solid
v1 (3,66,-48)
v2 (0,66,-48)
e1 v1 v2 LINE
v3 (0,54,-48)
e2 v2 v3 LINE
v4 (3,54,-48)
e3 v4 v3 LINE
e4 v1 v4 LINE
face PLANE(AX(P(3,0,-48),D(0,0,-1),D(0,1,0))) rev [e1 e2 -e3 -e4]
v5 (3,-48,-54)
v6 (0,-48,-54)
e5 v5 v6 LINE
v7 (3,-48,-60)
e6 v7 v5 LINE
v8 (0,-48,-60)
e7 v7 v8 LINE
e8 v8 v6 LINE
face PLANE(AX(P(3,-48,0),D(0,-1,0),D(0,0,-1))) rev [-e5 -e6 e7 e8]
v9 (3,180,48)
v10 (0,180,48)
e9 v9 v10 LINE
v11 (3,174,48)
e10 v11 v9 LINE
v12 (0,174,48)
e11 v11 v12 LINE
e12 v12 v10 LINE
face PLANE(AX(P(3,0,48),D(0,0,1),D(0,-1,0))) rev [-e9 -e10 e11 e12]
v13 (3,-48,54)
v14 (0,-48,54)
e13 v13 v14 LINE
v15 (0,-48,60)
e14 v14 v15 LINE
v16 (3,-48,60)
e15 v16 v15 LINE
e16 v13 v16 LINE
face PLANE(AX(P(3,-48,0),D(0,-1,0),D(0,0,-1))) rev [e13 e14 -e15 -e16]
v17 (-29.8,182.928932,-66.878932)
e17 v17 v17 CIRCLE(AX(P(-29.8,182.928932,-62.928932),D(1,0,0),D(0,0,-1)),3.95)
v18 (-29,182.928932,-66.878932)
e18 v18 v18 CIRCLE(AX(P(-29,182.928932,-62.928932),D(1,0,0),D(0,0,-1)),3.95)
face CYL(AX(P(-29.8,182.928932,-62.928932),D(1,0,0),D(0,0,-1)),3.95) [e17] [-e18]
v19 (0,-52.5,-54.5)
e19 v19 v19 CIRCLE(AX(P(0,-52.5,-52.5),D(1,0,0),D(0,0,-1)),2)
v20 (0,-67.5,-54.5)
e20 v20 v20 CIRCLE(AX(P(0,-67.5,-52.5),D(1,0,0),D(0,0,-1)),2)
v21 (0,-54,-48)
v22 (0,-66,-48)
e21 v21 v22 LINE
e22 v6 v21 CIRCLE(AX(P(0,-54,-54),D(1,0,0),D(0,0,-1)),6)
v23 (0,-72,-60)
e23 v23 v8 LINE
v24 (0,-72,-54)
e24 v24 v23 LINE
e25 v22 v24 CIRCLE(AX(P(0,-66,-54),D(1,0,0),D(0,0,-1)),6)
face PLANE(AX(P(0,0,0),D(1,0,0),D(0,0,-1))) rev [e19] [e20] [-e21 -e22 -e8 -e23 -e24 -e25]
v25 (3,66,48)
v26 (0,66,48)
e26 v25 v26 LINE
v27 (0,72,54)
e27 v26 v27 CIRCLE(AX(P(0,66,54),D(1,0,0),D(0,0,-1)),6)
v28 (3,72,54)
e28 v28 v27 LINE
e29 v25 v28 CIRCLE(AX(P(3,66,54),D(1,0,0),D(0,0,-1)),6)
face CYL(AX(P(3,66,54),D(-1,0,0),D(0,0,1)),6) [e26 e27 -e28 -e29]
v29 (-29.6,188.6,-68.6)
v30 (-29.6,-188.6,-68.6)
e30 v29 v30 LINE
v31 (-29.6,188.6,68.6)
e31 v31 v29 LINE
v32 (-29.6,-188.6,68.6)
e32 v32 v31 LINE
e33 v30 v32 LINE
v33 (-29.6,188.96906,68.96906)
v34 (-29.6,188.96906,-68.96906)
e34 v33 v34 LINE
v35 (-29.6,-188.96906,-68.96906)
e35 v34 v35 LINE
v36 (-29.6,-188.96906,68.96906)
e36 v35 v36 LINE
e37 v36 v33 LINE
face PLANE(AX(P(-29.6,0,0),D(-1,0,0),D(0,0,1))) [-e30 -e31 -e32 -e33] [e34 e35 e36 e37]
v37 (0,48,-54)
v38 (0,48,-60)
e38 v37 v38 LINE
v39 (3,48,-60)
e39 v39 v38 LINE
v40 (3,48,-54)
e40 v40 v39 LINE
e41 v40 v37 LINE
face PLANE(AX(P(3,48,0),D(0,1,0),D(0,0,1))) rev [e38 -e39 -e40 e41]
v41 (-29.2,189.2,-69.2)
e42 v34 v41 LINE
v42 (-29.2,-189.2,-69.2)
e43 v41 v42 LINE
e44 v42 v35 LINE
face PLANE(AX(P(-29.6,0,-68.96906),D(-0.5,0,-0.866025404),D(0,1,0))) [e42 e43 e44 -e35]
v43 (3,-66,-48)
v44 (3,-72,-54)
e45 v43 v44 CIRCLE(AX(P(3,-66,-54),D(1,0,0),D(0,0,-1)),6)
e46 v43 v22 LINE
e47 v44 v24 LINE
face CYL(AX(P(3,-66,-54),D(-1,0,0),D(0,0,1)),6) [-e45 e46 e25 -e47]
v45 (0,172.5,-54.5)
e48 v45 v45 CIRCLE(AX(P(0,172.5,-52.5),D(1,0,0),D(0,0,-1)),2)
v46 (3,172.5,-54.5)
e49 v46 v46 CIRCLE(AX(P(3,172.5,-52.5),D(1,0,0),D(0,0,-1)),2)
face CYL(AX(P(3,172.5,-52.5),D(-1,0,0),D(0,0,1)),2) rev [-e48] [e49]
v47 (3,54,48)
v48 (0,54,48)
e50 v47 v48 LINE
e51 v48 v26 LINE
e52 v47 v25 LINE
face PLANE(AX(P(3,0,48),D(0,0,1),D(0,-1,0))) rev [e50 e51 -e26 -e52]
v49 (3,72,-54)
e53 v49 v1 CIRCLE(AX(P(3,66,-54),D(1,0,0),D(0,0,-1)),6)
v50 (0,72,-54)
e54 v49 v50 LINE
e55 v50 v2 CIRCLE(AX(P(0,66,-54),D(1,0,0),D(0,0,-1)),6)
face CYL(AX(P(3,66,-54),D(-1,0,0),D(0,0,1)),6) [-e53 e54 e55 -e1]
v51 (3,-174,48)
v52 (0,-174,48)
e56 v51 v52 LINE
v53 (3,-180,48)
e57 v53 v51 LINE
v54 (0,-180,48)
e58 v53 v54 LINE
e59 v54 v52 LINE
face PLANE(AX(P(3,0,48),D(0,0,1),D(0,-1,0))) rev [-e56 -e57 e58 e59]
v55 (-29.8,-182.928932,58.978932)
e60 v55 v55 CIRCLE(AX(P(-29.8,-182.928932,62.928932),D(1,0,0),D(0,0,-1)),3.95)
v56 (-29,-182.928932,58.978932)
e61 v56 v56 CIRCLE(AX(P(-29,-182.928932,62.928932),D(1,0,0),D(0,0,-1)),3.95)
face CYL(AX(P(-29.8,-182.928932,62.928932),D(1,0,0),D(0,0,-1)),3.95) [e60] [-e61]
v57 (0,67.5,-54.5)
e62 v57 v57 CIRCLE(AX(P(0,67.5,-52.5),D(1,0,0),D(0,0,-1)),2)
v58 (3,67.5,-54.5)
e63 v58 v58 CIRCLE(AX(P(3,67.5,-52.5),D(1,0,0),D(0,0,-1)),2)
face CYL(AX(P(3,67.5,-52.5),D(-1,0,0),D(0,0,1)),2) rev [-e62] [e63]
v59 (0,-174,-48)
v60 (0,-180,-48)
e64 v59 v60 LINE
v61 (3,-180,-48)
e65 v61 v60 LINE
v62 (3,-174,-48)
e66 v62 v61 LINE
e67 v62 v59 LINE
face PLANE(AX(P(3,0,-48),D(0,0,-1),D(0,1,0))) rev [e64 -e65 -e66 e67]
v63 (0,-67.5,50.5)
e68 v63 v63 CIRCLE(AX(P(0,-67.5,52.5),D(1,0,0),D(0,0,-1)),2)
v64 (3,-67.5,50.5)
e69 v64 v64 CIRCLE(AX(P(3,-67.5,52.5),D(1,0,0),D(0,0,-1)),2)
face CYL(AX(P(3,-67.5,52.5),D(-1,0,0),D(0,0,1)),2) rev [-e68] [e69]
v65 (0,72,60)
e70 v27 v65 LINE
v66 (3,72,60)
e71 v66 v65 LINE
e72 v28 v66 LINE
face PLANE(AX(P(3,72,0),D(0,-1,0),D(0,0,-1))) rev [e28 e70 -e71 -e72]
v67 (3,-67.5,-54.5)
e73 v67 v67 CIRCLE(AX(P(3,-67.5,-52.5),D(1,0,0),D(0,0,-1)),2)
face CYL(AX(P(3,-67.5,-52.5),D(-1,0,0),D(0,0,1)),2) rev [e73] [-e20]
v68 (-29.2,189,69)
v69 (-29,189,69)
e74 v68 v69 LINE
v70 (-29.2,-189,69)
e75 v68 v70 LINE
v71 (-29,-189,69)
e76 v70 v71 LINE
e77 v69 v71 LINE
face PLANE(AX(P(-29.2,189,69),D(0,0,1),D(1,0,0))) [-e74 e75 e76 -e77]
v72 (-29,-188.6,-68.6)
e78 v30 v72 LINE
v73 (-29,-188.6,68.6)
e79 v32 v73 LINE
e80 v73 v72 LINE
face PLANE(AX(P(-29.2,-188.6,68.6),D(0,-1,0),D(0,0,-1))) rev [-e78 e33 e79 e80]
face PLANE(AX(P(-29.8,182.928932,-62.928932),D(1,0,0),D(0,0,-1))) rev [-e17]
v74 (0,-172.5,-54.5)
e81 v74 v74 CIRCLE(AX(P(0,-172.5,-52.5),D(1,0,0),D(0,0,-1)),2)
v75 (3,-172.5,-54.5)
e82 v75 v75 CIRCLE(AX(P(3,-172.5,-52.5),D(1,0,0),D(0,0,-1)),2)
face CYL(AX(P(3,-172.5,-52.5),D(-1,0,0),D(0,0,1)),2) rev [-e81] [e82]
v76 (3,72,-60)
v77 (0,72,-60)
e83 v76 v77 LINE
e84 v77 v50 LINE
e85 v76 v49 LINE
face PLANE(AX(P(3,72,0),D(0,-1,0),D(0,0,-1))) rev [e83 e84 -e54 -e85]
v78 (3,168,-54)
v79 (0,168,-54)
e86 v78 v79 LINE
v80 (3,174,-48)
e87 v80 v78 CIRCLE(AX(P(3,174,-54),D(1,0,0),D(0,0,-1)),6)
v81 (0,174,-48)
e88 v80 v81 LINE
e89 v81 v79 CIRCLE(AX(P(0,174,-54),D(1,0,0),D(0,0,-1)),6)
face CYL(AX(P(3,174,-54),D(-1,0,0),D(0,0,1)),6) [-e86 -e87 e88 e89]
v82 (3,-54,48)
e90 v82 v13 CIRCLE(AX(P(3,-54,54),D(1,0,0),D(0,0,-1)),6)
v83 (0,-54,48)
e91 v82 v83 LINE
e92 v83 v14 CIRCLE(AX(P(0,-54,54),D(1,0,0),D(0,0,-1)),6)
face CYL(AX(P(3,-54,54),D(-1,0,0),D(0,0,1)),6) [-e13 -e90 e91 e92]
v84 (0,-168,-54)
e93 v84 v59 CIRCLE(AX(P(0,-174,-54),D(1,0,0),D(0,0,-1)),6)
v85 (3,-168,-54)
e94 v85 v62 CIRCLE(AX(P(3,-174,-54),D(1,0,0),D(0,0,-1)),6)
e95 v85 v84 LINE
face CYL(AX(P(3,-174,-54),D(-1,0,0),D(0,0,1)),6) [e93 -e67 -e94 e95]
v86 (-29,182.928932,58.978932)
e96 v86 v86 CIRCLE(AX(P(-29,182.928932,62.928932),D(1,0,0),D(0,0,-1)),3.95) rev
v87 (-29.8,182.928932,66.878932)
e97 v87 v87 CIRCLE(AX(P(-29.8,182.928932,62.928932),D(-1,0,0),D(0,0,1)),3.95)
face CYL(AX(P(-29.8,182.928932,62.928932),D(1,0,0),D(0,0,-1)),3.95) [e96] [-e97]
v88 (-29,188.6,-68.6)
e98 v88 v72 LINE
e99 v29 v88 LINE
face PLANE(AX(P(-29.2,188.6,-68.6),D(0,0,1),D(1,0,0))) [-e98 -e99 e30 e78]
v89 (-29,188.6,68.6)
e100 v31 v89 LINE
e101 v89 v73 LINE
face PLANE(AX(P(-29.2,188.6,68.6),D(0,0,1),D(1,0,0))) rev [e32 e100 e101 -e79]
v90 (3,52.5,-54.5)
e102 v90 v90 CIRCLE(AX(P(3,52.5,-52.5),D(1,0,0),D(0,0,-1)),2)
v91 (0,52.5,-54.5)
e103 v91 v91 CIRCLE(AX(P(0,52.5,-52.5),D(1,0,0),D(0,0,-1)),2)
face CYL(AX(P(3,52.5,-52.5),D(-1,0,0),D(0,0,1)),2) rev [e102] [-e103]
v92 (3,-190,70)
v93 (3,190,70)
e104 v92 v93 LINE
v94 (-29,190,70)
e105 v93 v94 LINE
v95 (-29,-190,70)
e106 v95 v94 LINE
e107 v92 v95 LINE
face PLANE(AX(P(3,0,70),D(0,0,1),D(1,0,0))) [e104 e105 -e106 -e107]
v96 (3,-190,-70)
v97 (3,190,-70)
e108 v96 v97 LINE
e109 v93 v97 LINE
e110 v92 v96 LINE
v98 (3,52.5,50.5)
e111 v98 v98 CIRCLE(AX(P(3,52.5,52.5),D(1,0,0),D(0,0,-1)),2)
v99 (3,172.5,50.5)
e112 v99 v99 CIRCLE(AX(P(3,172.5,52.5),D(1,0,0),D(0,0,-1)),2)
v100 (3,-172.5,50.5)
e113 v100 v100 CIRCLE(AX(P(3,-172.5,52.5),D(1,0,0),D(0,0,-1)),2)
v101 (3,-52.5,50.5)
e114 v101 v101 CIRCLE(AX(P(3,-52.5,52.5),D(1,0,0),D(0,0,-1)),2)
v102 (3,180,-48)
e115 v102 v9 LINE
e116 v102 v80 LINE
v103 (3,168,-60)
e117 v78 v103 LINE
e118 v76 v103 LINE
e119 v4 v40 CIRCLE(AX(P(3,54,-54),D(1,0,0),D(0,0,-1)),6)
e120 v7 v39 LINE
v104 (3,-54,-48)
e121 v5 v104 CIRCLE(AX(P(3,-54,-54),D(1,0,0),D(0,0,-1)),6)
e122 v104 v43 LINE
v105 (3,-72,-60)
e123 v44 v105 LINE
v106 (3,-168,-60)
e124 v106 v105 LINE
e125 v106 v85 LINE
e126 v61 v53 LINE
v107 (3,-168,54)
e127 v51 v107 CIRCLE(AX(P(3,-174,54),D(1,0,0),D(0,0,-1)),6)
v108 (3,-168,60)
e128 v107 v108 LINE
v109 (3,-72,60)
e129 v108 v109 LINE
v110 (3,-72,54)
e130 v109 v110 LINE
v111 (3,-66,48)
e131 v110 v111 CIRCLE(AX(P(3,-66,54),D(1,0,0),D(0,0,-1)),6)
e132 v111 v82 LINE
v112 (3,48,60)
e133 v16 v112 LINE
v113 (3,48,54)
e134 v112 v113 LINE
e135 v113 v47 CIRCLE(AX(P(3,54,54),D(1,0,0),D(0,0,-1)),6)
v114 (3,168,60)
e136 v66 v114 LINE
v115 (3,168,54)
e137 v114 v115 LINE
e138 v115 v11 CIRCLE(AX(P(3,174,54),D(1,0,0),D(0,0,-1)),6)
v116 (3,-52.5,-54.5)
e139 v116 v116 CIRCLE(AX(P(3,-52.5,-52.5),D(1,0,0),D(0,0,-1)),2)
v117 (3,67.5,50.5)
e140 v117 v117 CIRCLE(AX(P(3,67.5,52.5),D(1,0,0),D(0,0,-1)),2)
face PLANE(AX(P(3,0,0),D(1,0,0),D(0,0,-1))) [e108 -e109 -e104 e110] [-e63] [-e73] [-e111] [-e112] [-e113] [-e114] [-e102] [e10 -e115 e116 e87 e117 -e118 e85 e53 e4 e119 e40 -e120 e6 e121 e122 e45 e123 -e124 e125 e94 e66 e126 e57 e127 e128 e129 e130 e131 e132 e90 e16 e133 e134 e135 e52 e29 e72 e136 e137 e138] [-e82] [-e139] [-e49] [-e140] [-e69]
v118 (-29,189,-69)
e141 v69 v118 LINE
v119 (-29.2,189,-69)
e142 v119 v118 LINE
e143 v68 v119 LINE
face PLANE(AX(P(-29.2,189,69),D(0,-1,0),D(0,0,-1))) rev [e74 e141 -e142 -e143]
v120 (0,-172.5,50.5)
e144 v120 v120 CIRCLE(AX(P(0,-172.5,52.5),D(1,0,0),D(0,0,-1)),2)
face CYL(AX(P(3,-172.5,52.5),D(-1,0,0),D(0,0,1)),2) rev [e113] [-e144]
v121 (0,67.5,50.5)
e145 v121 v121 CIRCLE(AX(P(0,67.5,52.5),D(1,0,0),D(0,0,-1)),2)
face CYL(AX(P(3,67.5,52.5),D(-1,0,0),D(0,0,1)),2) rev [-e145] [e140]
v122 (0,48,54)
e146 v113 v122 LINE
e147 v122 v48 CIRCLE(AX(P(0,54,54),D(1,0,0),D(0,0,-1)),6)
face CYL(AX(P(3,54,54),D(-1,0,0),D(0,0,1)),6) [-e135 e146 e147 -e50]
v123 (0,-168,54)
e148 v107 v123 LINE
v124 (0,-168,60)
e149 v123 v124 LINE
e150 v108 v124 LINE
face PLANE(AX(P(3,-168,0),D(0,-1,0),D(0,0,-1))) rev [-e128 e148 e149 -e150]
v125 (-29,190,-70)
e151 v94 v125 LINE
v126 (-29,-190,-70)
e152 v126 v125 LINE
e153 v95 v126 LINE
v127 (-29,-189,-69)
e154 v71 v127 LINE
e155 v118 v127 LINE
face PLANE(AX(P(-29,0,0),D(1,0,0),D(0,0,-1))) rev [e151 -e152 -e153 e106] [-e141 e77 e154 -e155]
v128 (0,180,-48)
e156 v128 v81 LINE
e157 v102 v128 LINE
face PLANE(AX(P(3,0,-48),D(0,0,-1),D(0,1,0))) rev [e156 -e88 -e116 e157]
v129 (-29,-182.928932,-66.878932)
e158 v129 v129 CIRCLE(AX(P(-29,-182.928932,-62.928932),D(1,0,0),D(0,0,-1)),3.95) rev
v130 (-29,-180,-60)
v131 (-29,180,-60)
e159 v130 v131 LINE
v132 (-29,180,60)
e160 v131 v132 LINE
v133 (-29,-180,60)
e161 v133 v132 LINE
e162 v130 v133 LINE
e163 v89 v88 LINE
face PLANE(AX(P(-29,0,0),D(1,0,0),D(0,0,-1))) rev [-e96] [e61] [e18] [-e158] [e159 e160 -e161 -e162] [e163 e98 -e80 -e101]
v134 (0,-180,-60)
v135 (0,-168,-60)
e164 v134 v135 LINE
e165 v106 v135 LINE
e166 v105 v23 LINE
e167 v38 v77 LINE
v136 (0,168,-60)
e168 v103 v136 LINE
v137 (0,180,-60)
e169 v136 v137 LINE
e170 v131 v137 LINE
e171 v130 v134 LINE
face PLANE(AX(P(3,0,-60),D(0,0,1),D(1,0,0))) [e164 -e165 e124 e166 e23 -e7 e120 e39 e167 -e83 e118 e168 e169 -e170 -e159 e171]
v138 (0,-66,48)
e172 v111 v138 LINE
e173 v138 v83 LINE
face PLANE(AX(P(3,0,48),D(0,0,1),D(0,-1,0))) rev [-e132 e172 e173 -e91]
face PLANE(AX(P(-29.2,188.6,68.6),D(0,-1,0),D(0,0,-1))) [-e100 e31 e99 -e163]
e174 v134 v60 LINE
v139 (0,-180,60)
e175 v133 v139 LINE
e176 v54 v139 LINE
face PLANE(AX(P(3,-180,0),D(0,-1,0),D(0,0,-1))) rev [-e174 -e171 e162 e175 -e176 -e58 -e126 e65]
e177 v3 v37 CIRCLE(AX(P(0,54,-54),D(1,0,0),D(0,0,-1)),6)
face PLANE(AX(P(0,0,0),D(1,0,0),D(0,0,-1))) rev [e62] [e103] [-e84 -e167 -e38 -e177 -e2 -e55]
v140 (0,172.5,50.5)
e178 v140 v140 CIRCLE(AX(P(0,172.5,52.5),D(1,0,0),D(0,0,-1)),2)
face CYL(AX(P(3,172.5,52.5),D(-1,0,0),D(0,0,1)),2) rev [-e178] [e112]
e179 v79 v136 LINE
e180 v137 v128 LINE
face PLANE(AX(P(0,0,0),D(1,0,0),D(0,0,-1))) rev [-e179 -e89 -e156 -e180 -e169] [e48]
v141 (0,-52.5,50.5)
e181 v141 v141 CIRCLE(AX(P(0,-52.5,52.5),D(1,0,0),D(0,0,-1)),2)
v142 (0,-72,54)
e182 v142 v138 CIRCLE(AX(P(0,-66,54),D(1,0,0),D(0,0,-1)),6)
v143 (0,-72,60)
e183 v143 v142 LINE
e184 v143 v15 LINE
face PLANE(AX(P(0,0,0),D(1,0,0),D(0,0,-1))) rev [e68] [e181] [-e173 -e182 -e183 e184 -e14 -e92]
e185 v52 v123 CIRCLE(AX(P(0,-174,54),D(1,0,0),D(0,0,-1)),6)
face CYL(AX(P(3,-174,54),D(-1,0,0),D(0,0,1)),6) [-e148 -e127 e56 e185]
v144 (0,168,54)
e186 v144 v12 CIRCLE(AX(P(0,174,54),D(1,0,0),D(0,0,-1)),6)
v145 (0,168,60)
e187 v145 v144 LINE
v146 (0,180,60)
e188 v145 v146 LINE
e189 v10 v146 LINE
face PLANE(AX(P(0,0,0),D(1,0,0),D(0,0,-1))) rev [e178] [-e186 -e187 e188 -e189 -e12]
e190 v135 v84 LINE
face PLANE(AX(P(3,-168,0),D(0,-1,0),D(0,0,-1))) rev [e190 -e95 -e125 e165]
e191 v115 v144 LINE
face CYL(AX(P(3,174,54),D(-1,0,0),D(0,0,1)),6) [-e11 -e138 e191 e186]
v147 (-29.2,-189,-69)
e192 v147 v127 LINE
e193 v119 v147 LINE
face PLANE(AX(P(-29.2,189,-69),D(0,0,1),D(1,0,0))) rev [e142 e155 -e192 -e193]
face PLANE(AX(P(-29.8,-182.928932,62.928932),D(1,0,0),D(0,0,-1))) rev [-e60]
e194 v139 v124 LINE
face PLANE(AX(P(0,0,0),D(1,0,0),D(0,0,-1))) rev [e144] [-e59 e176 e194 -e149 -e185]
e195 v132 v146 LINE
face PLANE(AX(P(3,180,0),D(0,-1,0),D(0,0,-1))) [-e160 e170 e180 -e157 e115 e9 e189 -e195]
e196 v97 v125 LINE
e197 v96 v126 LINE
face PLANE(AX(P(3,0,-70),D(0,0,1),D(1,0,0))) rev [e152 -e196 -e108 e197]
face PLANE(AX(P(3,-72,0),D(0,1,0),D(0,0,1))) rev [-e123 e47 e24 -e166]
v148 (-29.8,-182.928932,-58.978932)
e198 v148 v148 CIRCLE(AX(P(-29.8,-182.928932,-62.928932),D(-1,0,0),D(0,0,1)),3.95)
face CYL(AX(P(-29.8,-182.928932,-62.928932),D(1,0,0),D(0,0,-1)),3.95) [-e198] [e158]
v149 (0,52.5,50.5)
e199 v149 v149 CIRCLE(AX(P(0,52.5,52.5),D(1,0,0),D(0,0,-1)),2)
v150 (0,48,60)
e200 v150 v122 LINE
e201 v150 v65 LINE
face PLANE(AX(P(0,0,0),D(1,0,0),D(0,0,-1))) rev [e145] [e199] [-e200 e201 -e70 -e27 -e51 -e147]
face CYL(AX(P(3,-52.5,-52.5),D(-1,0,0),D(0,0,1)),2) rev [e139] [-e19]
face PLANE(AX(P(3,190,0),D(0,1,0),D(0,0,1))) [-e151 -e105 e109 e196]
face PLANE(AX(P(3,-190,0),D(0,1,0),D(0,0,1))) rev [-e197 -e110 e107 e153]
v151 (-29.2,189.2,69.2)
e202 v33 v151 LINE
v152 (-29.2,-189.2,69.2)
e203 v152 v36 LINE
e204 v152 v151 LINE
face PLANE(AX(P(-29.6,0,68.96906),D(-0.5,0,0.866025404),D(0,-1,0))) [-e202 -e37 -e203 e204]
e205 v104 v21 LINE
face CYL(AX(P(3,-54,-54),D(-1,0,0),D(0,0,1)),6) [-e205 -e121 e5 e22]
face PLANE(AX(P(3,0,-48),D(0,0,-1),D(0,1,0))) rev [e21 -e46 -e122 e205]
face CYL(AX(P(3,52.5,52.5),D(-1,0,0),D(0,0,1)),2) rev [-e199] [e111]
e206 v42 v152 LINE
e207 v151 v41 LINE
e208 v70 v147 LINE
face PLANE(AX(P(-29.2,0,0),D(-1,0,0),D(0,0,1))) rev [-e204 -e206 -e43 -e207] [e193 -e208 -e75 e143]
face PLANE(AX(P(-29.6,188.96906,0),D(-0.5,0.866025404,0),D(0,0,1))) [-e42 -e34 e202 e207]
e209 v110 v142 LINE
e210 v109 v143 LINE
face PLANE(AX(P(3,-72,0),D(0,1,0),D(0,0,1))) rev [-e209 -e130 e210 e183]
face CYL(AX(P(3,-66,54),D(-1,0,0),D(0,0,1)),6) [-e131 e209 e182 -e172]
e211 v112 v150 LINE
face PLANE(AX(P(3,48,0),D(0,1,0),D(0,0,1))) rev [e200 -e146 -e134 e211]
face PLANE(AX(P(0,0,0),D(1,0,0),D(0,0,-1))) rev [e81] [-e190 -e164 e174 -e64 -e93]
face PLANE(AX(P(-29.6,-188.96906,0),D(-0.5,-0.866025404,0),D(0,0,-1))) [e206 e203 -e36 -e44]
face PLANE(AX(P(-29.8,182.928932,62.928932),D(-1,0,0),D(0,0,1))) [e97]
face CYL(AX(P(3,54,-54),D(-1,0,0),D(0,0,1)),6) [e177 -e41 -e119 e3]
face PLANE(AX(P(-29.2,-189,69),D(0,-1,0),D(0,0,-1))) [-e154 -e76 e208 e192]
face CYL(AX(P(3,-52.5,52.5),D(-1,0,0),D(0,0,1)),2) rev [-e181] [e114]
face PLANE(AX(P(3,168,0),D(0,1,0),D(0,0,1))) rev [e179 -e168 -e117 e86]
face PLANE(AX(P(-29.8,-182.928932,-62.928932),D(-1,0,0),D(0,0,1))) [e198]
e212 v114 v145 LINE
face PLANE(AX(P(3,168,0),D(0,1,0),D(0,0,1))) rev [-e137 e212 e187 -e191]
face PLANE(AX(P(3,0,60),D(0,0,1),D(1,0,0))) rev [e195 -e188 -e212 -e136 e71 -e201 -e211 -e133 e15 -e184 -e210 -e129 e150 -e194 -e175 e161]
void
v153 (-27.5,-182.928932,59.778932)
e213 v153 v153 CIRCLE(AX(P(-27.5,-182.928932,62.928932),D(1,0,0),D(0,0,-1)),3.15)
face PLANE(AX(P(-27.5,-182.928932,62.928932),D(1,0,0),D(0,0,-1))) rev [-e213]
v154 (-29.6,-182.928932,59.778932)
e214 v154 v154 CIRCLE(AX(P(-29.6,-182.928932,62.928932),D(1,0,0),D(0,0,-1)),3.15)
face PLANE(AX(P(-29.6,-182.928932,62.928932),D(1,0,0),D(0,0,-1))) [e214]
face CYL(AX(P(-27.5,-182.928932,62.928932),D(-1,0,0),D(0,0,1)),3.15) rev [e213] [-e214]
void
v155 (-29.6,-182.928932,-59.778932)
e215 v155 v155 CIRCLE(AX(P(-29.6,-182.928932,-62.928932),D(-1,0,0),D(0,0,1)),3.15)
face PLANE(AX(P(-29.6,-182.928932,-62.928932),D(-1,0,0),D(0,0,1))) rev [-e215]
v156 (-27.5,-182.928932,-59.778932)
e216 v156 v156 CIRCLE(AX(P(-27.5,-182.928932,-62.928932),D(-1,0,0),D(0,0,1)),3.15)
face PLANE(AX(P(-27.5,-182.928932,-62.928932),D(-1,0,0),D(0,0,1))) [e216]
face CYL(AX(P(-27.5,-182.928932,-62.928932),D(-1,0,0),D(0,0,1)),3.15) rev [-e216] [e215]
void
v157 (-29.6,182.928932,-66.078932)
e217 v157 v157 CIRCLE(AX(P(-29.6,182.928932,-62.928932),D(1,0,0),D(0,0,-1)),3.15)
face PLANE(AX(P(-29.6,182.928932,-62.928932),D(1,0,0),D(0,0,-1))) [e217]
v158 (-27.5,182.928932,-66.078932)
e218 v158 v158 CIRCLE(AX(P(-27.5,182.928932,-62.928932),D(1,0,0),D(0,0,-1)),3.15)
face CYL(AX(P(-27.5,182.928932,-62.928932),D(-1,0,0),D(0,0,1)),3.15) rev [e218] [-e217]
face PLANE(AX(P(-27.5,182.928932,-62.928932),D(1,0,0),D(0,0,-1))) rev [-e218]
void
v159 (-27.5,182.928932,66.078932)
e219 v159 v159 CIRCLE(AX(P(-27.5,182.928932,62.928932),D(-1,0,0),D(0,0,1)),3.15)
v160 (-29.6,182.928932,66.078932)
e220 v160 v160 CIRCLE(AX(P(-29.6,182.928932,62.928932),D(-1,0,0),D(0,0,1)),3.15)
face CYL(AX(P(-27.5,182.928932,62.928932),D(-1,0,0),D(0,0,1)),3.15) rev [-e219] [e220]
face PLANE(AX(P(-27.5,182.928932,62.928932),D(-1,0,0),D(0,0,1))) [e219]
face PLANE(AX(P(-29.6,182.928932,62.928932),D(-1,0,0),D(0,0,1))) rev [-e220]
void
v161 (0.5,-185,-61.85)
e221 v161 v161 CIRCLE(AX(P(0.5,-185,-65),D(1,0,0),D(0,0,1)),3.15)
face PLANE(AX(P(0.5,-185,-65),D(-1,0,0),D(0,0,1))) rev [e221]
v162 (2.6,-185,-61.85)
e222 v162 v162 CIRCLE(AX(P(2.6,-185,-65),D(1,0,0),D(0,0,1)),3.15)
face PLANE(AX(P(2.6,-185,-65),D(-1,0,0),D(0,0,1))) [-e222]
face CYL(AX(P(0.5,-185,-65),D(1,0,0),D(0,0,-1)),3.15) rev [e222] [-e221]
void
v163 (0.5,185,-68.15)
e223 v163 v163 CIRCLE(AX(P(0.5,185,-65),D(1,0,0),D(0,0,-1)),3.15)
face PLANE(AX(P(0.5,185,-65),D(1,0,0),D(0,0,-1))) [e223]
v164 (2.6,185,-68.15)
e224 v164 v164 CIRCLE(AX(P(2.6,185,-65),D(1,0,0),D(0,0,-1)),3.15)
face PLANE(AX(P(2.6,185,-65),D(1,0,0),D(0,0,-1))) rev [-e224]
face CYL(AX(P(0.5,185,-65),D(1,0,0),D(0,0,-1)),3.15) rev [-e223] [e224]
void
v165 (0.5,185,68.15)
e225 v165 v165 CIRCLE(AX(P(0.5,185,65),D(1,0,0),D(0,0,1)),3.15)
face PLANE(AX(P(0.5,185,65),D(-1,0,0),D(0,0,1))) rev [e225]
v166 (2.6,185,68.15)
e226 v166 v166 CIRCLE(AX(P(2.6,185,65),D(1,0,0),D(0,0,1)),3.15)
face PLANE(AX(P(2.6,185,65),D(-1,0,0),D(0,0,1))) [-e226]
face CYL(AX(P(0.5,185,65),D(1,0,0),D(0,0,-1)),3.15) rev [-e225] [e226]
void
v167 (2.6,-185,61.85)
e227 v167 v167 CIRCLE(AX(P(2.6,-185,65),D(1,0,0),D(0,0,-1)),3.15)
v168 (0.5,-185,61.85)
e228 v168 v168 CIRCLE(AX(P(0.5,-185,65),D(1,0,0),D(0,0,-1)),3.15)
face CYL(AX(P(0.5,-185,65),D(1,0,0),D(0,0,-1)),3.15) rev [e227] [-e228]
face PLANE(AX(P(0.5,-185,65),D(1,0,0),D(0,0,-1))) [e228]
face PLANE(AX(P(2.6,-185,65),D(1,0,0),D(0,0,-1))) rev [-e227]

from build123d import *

# Parameters (mm, degrees)
SKETCH1_W                        = 380
SKETCH1_H                        = 140
SKETCH1_W_2                      = 360
SKETCH1_H_2                      = 120
SKETCH1_R                        = 2
BOSS_EXTRUDE2_DEPTH              = 3
SKETCH1_6_W                      = 380
SKETCH1_6_H                      = 140
SKETCH1_6_W_2                    = 360
SKETCH1_6_H_2                    = 120
BOSS_EXTRUDE5_DEPTH              = 29
SKETCH14_W                       = 378
SKETCH14_H                       = 138
SKETCH14_W_2                     = 377.2
SKETCH14_H_2                     = 137.2
BOSS_EXTRUDE7_DEPTH              = 0.2
SKETCH14_4_R                     = 3.95
BOSS_EXTRUDE9_DEPTH              = 0.8
MOUNTING_MAGNET_HOLES_DEPTH      = 0.6
MOUNTING_MAGNET_HOLES_DEPTH_BACK = 1.5
SKETCH14_5_R                     = 3.15
SKETCH17_W                       = 378.4
SKETCH17_H                       = 138.4
SKETCH17_W_2                     = 377.2
SKETCH17_H_2                     = 137.2
BOSS_EXTRUDE10_DEPTH             = 0.4
CHAMFER1_SIZE                    = 0.4
CHAMFER1_SIZE_2                  = 0.230940108
COVER_START                      = -0.4
SKETCH18_R                       = 3.15
COVER_MAGNET_HOLES_DEPTH         = 2.1


with BuildPart() as part:
    # Sketch1 → Boss-Extrude2 (new body)
    # profile 1 of 13: a face of its own
    with BuildSketch(Plane.YZ):
        Rectangle(SKETCH1_W, SKETCH1_H)
        Rectangle(SKETCH1_W_2, SKETCH1_H_2, mode=Mode.SUBTRACT)
    # profile 2 of 13: a face of its own
    with BuildSketch(Plane.YZ):
        with BuildLine():
            Line((-180, 60), (-180, 48))
            Line((-180, 48), (-174, 48))
            ThreePointArc((-174, 48), (-169.757359313, 49.757359313), (-168, 54))
            Line((-168, 54), (-168, 60))
            Line((-168, 60), (-180, 60))
        make_face()
        with Locations(Location((-172.5, 52.5, 0), (0, 0, 270))):
            Circle(SKETCH1_R, mode=Mode.SUBTRACT)
    # profile 3 of 13: a face of its own
    with BuildSketch(Plane.YZ):
        with BuildLine():
            Line((-60, 60), (-72, 60))
            Line((-72, 60), (-72, 54))
            ThreePointArc((-72, 54), (-70.242640687, 49.757359313), (-66, 48))
            Line((-66, 48), (-60, 48))
            Line((-60, 48), (-60, 60))
        make_face()
        with Locations(Location((-67.5, 52.5, 0), (0, 0, 270))):
            Circle(SKETCH1_R, mode=Mode.SUBTRACT)
    # profile 4 of 13: a face of its own
    with BuildSketch(Plane.YZ):
        with BuildLine():
            Line((-48, 60), (-60, 60))
            Line((-60, 60), (-60, 48))
            Line((-60, 48), (-54, 48))
            ThreePointArc((-54, 48), (-49.757359313, 49.757359313), (-48, 54))
            Line((-48, 54), (-48, 60))
        make_face()
        with Locations(Location((-52.5, 52.5, 0), (0, 0, 270))):
            Circle(SKETCH1_R, mode=Mode.SUBTRACT)
    # profile 5 of 13: a face of its own
    with BuildSketch(Plane.YZ):
        with BuildLine():
            Line((-60, -48), (-60, -60))
            Line((-60, -60), (-48, -60))
            Line((-48, -60), (-48, -54))
            ThreePointArc((-48, -54), (-49.757359313, -49.757359313), (-54, -48))
            Line((-54, -48), (-60, -48))
        make_face()
        with Locations(Location((-52.5, -52.5, 0), (0, 0, 270))):
            Circle(SKETCH1_R, mode=Mode.SUBTRACT)
    # profile 6 of 13: a face of its own
    with BuildSketch(Plane.YZ):
        with BuildLine():
            Line((-72, -54), (-72, -60))
            Line((-72, -60), (-60, -60))
            Line((-60, -60), (-60, -48))
            Line((-60, -48), (-66, -48))
            ThreePointArc((-66, -48), (-70.242640687, -49.757359313), (-72, -54))
        make_face()
        with Locations(Location((-67.5, -52.5, 0), (0, 0, 270))):
            Circle(SKETCH1_R, mode=Mode.SUBTRACT)
    # profile 7 of 13: a face of its own
    with BuildSketch(Plane.YZ):
        with BuildLine():
            Line((-180, -48), (-180, -60))
            Line((-180, -60), (-168, -60))
            Line((-168, -60), (-168, -54))
            ThreePointArc((-168, -54), (-169.757359313, -49.757359313), (-174, -48))
            Line((-174, -48), (-180, -48))
        make_face()
        with Locations(Location((-172.5, -52.5, 0), (0, 0, 270))):
            Circle(SKETCH1_R, mode=Mode.SUBTRACT)
    # profile 8 of 13: a face of its own
    with BuildSketch(Plane.YZ):
        with BuildLine():
            Line((48, -54), (48, -60))
            Line((48, -60), (60, -60))
            Line((60, -60), (60, -48))
            Line((60, -48), (54, -48))
            ThreePointArc((54, -48), (49.757359313, -49.757359313), (48, -54))
        make_face()
        with Locations(Location((52.5, -52.5, 0), (0, 0, 270))):
            Circle(SKETCH1_R, mode=Mode.SUBTRACT)
    # profile 9 of 13: a face of its own
    with BuildSketch(Plane.YZ):
        with BuildLine():
            Line((60, -48), (60, -60))
            Line((60, -60), (72, -60))
            Line((72, -60), (72, -54))
            ThreePointArc((72, -54), (70.242640687, -49.757359313), (66, -48))
            Line((66, -48), (60, -48))
        make_face()
        with Locations(Location((67.5, -52.5, 0), (0, 0, 270))):
            Circle(SKETCH1_R, mode=Mode.SUBTRACT)
    # profile 10 of 13: a face of its own
    with BuildSketch(Plane.YZ):
        with BuildLine():
            Line((72, 60), (60, 60))
            Line((60, 60), (60, 48))
            Line((60, 48), (66, 48))
            ThreePointArc((66, 48), (70.242640687, 49.757359313), (72, 54))
            Line((72, 54), (72, 60))
        make_face()
        with Locations(Location((67.5, 52.5, 0), (0, 0, 270))):
            Circle(SKETCH1_R, mode=Mode.SUBTRACT)
    # profile 11 of 13: a face of its own
    with BuildSketch(Plane.YZ):
        with BuildLine():
            Line((60, 60), (48, 60))
            Line((48, 60), (48, 54))
            ThreePointArc((48, 54), (49.757359313, 49.757359313), (54, 48))
            Line((54, 48), (60, 48))
            Line((60, 48), (60, 60))
        make_face()
        with Locations(Location((52.5, 52.5, 0), (0, 0, 270))):
            Circle(SKETCH1_R, mode=Mode.SUBTRACT)
    # profile 12 of 13: a face of its own
    with BuildSketch(Plane.YZ):
        with BuildLine():
            Line((174, 48), (180, 48))
            Line((180, 48), (180, 60))
            Line((180, 60), (168, 60))
            Line((168, 60), (168, 54))
            ThreePointArc((168, 54), (169.757359313, 49.757359313), (174, 48))
        make_face()
        with Locations(Location((172.5, 52.5, 0), (0, 0, 270))):
            Circle(SKETCH1_R, mode=Mode.SUBTRACT)
    # profile 13 of 13: a face of its own
    with BuildSketch(Plane.YZ):
        with BuildLine():
            Line((168, -54), (168, -60))
            Line((168, -60), (180, -60))
            Line((180, -60), (180, -48))
            Line((180, -48), (174, -48))
            ThreePointArc((174, -48), (169.757359313, -49.757359313), (168, -54))
        make_face()
        with Locations(Location((172.5, -52.5, 0), (0, 0, 270))):
            Circle(SKETCH1_R, mode=Mode.SUBTRACT)
    extrude(amount=BOSS_EXTRUDE2_DEPTH)

    # Sketch1<6> → Boss-Extrude5 (add)
    with BuildSketch(Plane.YZ):
        Rectangle(SKETCH1_6_W, SKETCH1_6_H)
        Rectangle(SKETCH1_6_W_2, SKETCH1_6_H_2, mode=Mode.SUBTRACT)
    extrude(amount=-BOSS_EXTRUDE5_DEPTH)

    # Sketch14 → Boss-Extrude7 (add)
    with BuildSketch(Plane(origin=(-29, 0, 0), x_dir=(0, -1, 0), z_dir=(-1, 0, 0))):
        Rectangle(SKETCH14_W, SKETCH14_H)
        Rectangle(SKETCH14_W_2, SKETCH14_H_2, mode=Mode.SUBTRACT)
    extrude(amount=BOSS_EXTRUDE7_DEPTH)

    # Sketch14<4> → Boss-Extrude9 (add)
    with BuildSketch(Plane(origin=(-29, 0, 0), x_dir=(0, -1, 0), z_dir=(-1, 0, 0))):
        with Locations(Location((-182.928932188, 62.928932188, 0), (0, 0, 270))):
            Circle(SKETCH14_4_R)
        with Locations(Location((182.928932188, 62.928932188, 0), (0, 0, 270))):
            Circle(SKETCH14_4_R)
        with Locations(Location((182.928932188, -62.928932188, 0), (0, 0, 270))):
            Circle(SKETCH14_4_R)
        with Locations(Location((-182.928932188, -62.928932188, 0), (0, 0, 270))):
            Circle(SKETCH14_4_R)
    extrude(amount=BOSS_EXTRUDE9_DEPTH)

    # Sketch14<5> → Mounting magnet holes (cut, two sides: drawn at the far end of the back side and taken through both)
    with BuildSketch(Plane(origin=(-29, 0, 0), x_dir=(0, -1, 0), z_dir=(-1, 0, 0)).offset(-MOUNTING_MAGNET_HOLES_DEPTH_BACK)):
        with Locations(Location((-182.928932188, 62.928932188, 0), (0, 0, 90))):
            Circle(SKETCH14_5_R)
        with Locations(Location((182.928932188, 62.928932188, 0), (0, 0, 270))):
            Circle(SKETCH14_5_R)
        with Locations(Location((182.928932188, -62.928932188, 0), (0, 0, 90))):
            Circle(SKETCH14_5_R)
        with Locations(Location((-182.928932188, -62.928932188, 0), (0, 0, 270))):
            Circle(SKETCH14_5_R)
    extrude(amount=MOUNTING_MAGNET_HOLES_DEPTH + MOUNTING_MAGNET_HOLES_DEPTH_BACK, mode=Mode.SUBTRACT)

    # Sketch17 → Boss-Extrude10 (add)
    with BuildSketch(Plane(origin=(-29.2, 0, 0), x_dir=(0, -1, 0), z_dir=(-1, 0, 0))):
        Rectangle(SKETCH17_W, SKETCH17_H)
        Rectangle(SKETCH17_W_2, SKETCH17_H_2, mode=Mode.SUBTRACT)
    extrude(amount=BOSS_EXTRUDE10_DEPTH)

    # Chamfer1
    # the kernel refuses this chamfer: 0.4, 0.230940108 mm, written as the material it takes off along each edge
    with BuildSketch(Plane(origin=(-29.6, 190.234834302, -69.2), x_dir=(0.9998132206222082, 0, -0.01932676561269006), z_dir=(0, -1, 0))) as chamfer1_piece_1:
        Polygon((CHAMFER1_SIZE * 0.999813220622, CHAMFER1_SIZE * 0.0193267656127), (-CHAMFER1_SIZE_2 * 0.0193267655856, CHAMFER1_SIZE_2 * 0.999813219219), (0, 0), align=None)
    extrude(amount=380.469668604, mode=Mode.SUBTRACT)
    with BuildSketch(Plane(origin=(-29.6, -189.2, -70.234834302), x_dir=(-0.057893862402669215, 0.9983227437537926, 0), z_dir=(0, 0, 1)), Plane(origin=(-29.6, 189.2, 70.234834302), x_dir=(-0.057893862402669215, -0.9983227437537926, 0), z_dir=(0, 0, -1))) as chamfer1_piece_2:
        Polygon((CHAMFER1_SIZE_2 * 0.998322742353, -CHAMFER1_SIZE_2 * 0.0578938623214), (-CHAMFER1_SIZE * 0.0578938624027, -CHAMFER1_SIZE * 0.998322743754), (0, 0), align=None)
    extrude(amount=140.469668604, mode=Mode.SUBTRACT)
    with BuildSketch(Plane(origin=(-29.6, -190.234834302, 69.2), x_dir=(-0.057893862402672656, 0, -0.9983227437537925), z_dir=(0, 1, 0))) as chamfer1_piece_3:
        Polygon((CHAMFER1_SIZE_2 * 0.998322742353, -CHAMFER1_SIZE_2 * 0.0578938623214), (-CHAMFER1_SIZE * 0.0578938624027, -CHAMFER1_SIZE * 0.998322743754), (0, 0), align=None)
    extrude(amount=380.469668604, mode=Mode.SUBTRACT)

    # Sketch18 → Cover magnet holes (cut)
    with BuildSketch(Plane.YZ.offset(3).offset(COVER_START)):
        with Locations(Location((-185, 65, 0), (0, 0, 270))):
            Circle(SKETCH18_R)
        with Locations(Location((185, 65, 0), (0, 0, 90))):
            Circle(SKETCH18_R)
        with Locations(Location((185, -65, 0), (0, 0, 270))):
            Circle(SKETCH18_R)
        with Locations(Location((-185, -65, 0), (0, 0, 90))):
            Circle(SKETCH18_R)
    extrude(amount=-COVER_MAGNET_HOLES_DEPTH, mode=Mode.SUBTRACT)


solid = part.part
